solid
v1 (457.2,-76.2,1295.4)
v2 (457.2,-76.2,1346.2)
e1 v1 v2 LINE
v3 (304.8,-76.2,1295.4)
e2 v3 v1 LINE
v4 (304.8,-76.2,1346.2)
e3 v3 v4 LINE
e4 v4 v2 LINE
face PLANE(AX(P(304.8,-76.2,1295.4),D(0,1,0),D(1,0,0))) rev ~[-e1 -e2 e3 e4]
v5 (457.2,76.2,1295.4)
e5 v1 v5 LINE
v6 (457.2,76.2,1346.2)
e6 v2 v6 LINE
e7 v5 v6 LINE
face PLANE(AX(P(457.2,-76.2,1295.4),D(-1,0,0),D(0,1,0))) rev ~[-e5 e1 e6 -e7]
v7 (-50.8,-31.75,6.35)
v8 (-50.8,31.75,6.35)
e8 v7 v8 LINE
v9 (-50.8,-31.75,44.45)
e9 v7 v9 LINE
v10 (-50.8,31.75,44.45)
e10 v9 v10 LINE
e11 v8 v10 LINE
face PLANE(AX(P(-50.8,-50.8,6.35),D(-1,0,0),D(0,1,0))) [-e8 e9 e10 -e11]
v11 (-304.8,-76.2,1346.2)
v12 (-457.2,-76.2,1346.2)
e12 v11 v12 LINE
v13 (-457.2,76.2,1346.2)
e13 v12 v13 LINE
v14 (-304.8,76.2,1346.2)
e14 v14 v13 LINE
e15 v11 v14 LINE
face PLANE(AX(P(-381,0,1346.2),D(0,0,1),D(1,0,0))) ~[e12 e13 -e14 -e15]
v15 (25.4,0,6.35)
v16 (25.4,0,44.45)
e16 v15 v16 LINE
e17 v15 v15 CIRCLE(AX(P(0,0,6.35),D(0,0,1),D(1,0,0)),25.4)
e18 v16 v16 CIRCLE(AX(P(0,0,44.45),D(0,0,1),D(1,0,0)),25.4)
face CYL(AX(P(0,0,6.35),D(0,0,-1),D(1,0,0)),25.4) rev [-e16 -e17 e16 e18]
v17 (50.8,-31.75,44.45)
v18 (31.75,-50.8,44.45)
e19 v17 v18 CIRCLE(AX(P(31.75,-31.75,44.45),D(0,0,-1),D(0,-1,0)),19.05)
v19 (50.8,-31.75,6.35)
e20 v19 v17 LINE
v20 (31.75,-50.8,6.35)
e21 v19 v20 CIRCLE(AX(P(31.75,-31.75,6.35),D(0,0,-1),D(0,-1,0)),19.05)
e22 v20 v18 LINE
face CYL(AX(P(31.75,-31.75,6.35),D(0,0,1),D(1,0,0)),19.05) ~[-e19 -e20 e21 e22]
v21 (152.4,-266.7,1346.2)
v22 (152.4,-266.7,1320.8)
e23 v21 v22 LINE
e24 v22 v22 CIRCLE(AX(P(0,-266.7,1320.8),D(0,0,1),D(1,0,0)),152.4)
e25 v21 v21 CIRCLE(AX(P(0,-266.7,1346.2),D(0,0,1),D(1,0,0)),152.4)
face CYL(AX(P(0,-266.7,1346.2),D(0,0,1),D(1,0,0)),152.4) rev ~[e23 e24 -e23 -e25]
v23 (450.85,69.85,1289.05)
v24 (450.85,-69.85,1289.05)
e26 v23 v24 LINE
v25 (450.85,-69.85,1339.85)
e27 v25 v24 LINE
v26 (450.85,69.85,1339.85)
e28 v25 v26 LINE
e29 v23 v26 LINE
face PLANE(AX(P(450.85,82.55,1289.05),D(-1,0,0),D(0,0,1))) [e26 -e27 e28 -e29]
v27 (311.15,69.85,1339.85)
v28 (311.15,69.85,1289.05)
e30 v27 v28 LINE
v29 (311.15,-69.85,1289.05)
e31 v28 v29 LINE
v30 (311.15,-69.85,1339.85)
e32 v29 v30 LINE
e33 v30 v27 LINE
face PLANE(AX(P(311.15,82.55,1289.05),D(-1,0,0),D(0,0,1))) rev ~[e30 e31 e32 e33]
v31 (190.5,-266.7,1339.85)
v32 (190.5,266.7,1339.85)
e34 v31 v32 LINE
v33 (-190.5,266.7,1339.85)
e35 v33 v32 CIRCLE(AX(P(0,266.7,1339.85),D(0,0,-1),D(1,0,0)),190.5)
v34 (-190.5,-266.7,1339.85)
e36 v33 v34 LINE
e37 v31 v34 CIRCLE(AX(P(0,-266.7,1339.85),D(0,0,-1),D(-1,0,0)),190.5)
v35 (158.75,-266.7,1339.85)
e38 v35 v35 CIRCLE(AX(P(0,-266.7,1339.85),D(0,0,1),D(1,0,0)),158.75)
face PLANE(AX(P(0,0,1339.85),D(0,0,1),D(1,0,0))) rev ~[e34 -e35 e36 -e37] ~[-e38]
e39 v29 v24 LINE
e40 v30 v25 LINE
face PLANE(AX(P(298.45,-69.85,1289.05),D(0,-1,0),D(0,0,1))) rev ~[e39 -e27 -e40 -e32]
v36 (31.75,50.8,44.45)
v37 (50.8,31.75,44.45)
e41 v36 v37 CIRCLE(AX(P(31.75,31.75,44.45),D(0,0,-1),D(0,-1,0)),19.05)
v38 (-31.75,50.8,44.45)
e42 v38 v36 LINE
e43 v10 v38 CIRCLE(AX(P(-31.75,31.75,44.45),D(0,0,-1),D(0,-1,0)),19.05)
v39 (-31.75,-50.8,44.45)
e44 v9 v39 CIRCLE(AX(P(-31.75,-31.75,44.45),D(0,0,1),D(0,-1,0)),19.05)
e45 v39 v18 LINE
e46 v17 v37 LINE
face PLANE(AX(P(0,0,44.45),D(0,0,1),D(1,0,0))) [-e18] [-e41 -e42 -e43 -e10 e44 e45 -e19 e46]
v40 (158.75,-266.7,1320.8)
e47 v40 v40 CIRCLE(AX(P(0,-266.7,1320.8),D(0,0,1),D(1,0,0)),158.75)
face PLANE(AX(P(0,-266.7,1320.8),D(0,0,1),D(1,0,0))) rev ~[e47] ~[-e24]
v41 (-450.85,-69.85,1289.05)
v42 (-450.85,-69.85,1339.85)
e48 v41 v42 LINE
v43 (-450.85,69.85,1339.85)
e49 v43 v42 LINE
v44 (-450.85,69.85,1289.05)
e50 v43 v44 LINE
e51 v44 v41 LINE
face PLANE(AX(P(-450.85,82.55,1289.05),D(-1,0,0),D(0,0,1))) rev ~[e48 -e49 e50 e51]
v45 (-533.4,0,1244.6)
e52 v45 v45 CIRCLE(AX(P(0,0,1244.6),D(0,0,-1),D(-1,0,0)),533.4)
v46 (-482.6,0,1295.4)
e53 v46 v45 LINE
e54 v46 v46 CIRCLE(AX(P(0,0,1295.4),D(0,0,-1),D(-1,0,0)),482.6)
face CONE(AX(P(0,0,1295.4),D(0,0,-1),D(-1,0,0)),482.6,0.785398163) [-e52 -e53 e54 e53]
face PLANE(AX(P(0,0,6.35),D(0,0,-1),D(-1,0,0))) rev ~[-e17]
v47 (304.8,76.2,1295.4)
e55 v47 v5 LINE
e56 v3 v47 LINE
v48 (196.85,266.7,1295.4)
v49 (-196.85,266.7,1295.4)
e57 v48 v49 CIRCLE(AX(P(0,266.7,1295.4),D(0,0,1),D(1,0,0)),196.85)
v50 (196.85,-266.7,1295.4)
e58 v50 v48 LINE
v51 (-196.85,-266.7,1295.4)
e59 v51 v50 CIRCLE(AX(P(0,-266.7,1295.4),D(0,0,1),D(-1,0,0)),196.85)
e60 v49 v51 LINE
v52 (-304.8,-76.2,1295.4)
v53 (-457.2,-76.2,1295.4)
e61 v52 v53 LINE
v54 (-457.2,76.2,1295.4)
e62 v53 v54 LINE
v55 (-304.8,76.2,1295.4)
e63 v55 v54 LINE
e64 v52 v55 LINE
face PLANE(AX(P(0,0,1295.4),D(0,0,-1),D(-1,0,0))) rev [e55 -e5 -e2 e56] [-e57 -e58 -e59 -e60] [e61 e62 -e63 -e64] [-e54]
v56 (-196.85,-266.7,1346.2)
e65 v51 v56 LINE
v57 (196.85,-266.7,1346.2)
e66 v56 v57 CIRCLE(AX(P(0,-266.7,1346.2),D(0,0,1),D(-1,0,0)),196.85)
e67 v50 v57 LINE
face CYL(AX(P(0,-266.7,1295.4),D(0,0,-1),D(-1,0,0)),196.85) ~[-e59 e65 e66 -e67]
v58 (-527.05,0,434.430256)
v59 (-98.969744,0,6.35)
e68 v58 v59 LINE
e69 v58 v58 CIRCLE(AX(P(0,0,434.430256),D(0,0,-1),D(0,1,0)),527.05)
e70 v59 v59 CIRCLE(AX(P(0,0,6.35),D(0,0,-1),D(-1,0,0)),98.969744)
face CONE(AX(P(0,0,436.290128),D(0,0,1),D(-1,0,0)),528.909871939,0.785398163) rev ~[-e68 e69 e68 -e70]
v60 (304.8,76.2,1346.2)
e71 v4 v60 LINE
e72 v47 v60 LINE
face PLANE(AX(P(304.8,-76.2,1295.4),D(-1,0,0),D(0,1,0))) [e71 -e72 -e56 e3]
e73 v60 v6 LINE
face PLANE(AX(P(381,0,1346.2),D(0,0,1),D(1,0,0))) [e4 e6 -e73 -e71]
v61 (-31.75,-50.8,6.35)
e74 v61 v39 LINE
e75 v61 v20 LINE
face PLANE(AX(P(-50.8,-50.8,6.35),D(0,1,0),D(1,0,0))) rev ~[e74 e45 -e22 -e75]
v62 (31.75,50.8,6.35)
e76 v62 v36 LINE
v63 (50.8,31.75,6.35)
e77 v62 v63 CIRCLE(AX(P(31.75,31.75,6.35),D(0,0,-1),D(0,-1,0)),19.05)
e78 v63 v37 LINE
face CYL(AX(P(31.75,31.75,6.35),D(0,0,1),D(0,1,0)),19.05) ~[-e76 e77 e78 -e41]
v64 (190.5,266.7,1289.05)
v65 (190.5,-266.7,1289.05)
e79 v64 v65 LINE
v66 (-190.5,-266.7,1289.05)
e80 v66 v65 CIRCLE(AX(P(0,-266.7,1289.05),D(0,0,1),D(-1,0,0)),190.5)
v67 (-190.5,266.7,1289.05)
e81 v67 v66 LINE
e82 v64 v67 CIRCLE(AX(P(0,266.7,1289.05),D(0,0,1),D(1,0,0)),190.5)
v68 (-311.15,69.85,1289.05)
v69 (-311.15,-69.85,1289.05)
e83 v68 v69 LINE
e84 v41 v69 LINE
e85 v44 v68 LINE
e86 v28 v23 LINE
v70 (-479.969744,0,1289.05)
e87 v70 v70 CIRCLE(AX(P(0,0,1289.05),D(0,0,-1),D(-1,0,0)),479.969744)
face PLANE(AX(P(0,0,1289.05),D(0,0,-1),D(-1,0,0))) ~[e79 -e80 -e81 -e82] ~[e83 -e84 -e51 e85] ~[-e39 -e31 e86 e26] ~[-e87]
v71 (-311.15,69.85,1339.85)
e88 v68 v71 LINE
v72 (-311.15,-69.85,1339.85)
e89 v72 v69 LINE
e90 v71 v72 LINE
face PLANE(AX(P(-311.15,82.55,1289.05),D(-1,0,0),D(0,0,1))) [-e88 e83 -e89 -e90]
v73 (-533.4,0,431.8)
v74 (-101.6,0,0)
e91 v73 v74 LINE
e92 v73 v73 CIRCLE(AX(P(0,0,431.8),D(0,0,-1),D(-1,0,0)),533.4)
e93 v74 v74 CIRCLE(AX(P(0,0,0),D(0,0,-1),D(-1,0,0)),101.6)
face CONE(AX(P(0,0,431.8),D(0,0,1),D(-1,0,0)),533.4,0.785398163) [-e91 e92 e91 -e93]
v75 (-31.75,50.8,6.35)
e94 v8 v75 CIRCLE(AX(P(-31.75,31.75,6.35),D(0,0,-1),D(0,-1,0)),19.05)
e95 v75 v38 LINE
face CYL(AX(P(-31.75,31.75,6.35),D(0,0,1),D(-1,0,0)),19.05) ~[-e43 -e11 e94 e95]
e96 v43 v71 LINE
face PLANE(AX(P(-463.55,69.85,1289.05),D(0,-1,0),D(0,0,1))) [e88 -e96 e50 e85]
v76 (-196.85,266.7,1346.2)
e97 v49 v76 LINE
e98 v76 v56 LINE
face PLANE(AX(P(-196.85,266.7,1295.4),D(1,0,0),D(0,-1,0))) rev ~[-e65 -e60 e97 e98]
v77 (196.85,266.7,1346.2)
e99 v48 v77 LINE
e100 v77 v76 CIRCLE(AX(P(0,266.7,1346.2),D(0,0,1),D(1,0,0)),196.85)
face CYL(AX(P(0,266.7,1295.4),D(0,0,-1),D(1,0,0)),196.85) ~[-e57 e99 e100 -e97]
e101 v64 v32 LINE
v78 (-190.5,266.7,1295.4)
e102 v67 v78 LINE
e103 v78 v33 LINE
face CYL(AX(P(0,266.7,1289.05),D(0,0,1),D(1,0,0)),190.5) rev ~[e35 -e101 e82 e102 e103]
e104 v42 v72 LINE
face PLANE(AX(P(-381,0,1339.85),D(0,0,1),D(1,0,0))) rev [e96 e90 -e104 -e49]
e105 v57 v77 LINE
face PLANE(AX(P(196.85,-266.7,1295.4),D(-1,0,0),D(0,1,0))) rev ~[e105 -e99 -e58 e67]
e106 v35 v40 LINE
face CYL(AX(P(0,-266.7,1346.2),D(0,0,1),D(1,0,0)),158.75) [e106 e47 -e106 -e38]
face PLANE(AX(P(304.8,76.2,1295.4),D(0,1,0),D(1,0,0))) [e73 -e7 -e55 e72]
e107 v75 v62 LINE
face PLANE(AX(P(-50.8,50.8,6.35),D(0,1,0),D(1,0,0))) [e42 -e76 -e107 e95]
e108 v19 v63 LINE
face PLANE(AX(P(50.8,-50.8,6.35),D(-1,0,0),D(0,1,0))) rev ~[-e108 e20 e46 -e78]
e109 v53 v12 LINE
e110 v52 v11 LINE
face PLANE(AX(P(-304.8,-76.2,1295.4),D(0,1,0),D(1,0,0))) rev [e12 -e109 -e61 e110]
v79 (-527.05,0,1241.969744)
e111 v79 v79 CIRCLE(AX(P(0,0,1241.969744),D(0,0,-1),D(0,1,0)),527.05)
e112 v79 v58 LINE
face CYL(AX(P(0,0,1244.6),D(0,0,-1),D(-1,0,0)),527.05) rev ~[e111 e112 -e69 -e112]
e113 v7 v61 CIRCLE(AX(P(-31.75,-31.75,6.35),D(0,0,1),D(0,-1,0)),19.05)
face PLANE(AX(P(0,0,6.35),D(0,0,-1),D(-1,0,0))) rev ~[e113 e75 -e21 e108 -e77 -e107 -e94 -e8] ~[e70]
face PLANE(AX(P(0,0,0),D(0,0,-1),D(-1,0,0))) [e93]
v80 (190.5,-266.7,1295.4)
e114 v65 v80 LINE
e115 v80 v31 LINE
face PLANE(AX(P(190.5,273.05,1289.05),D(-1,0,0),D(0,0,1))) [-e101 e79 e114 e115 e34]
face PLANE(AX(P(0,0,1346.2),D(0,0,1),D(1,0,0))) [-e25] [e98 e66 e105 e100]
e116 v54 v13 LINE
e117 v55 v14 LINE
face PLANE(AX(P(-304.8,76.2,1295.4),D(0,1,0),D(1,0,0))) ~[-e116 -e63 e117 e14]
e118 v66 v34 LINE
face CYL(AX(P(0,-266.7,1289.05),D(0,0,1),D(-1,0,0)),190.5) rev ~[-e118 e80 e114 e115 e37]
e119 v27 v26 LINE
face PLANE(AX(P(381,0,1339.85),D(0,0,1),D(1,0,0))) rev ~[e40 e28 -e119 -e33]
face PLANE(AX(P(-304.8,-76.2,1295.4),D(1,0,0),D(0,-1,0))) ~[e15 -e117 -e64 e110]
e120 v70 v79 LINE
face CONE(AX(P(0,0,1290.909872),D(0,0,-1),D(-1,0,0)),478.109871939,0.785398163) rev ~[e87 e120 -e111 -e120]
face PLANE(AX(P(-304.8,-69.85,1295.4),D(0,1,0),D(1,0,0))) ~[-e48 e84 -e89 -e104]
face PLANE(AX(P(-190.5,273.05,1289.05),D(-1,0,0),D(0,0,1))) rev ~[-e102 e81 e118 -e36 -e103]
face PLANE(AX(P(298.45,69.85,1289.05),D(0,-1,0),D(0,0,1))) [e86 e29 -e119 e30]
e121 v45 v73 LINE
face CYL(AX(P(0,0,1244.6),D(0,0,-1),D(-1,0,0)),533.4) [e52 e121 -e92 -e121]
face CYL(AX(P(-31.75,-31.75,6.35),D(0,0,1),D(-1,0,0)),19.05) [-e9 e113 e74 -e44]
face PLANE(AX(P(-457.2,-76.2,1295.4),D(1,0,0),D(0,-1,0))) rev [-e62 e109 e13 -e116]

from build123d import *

# Parameters (mm, degrees)
F2_W         = 152.4
F2_H         = 152.4
F3_DEPTH     = 50.8
F5_DEPTH     = 50.8
F6_R         = 152.4
F7_DEPTH     = 25.4
F8_T         = 6.35
F8_T3_DEPTH  = 165.1
F8_T5_DEPTH  = 165.1
F8_T7_DEPTH  = 546.1
F8_T9_DEPTH  = 165.1
F8_T12_ANGLE = 180.000000001
F8_T14_ANGLE = 180.000000001
F9_W         = 101.6
F9_H         = 101.6
F9_R         = 25.4
F10_DEPTH    = 38.1
F11_R        = 19.05


# Not quite as in the source:
# - a pattern or mirror of a feature is missing from the dataset's text; its kind, count and spacing are read off the source's solid
# - a shell that OpenCascade refuses in one call is made with other operations: the cavity is built on its own and cut out


with BuildPart() as f1:
    # F0 (on Front) → F1 (revolve)
    with BuildSketch(Plane.XZ):
        Polygon((-101.6, 0), (0, 0), (0, 1295.4), (-482.6, 1295.4), (-533.4, 1244.6), (-533.4, 431.8), align=None)
    revolve(axis=Axis((0, 0, 647.7), (0, 0, -1)))

    # F2 (on face) → F3 (join)
    with BuildSketch(Plane.XY.offset(1295.4)):
        with Locations((381, 0)):
            Rectangle(F2_W, F2_H)
    f3 = extrude(amount=F3_DEPTH)

    # F3_copies: F3 across plane
    add(f3.mirror(Plane(origin=(0, 0, 0), x_dir=(0, 0, -1), z_dir=(-1, 0, 0))))

    # F4 (on face) → F5 (join)
    with BuildSketch(Plane.XY.offset(1295.4)):
        with BuildLine():
            ThreePointArc((0, 463.55), (-139.1939698766, 405.8939698766), (-196.85, 266.7))
            Line((-196.85, 266.7), (-196.85, -266.7))
            ThreePointArc((-196.85, -266.7), (-139.1939698766, -405.8939698766), (0, -463.55))
            ThreePointArc((0, -463.55), (139.1939698766, -405.8939698766), (196.85, -266.7))
            Line((196.85, -266.7), (196.85, 266.7))
            ThreePointArc((196.85, 266.7), (139.1939698766, 405.8939698766), (0, 463.55))
        make_face()
    extrude(amount=F5_DEPTH)

    # F6 (on face) → F7 (cut)
    with BuildSketch(Plane.XY.offset(1346.2)):
        with Locations((0, -266.7)):
            Circle(F6_R)
    extrude(amount=-F7_DEPTH, mode=Mode.SUBTRACT)

    # F8: shell of thickness 6.35, made by hand


with BuildPart() as f8_core1:
    # F8_t2: copy of F1
    add(f1.part)

    # the walls: a layer under each face that stays
    f8_faces = [f8_core1.faces().sort_by_distance(p)[0] for p in [
        (0, 0, 0),
        (317.5, 0, 215.9),
        (533.4, 0, 838.2),
        (508, 0, 1270),
        (-321.7333333333, -321.7333333333, 1295.4),
        (-457.2, 0, 1320.8),
        (-381, -76.2, 1320.8),
        (-381, 76.2, 1320.8),
        (-304.8, 0, 1320.8),
        (0, 463.55, 1320.8),
        (-196.85, 0, 1320.8),
        (0, -463.55, 1320.8),
        (196.85, 0, 1320.8),
        (381, 76.2, 1320.8),
        (457.2, 0, 1320.8),
        (304.8, 0, 1320.8),
        (381, -76.2, 1320.8),
        (-381, 0, 1346.2),
        (0, 0, 1346.2),
        (381, 0, 1346.2),
        (-152.4, -266.7, 1333.5),
    ]]
    thicken(f8_faces, amount=-F8_T, mode=Mode.SUBTRACT)

    # F8_s4 → F8_t3 (cut)
    with BuildSketch(Plane.XZ.offset(-82.55)):
        Polygon((-457.2635, 1295.4635), (-457.2, 1289.05), (-450.85, 1289.05), (-450.85, 1295.4), align=None)
        Polygon((-304.7365, 1295.4635), (-304.8, 1289.05), (-311.15, 1289.05), (-311.15, 1295.4), align=None)
        Polygon((457.2635, 1295.4635), (457.2, 1289.05), (450.85, 1289.05), (450.85, 1295.4), align=None)
        Polygon((304.7365, 1295.4635), (304.8, 1289.05), (311.15, 1289.05), (311.15, 1295.4), align=None)
    extrude(amount=F8_T3_DEPTH, mode=Mode.SUBTRACT)

    # F8_s6 → F8_t5 (cut)
    with BuildSketch(Plane.YZ.offset(-463.55)):
        Polygon((-76.2635, 1295.4635), (-76.2, 1289.05), (-69.85, 1289.05), (-69.85, 1295.4), align=None)
        Polygon((76.2635, 1295.4635), (76.2, 1289.05), (69.85, 1289.05), (69.85, 1295.4), align=None)
    extrude(amount=F8_T5_DEPTH, mode=Mode.SUBTRACT)

    # F8_s8 → F8_t7 (cut)
    with BuildSketch(Plane.XZ.offset(-273.05)):
        Polygon((-196.9135, 1295.4635), (-196.85, 1289.05), (-190.5, 1289.05), (-190.5, 1295.4), align=None)
        Polygon((196.9135, 1295.4635), (196.85, 1289.05), (190.5, 1289.05), (190.5, 1295.4), align=None)
    extrude(amount=F8_T7_DEPTH, mode=Mode.SUBTRACT)

    # F8_s10 → F8_t9 (cut)
    with BuildSketch(Plane.YZ.offset(298.45)):
        Polygon((76.2635, 1295.4635), (76.2, 1289.05), (69.85, 1289.05), (69.85, 1295.4), align=None)
        Polygon((-76.2635, 1295.4635), (-76.2, 1289.05), (-69.85, 1289.05), (-69.85, 1295.4), align=None)
    extrude(amount=F8_T9_DEPTH, mode=Mode.SUBTRACT)

    # F8_s11 → F8_t12 (revolve, cut)
    with BuildSketch(Plane.XZ.offset(-266.7)):
        Polygon((196.9135, 1295.4635), (196.85, 1289.05), (190.5, 1289.05), (190.5, 1295.4), align=None)
    revolve(axis=Axis((0, 266.7, 1295.4), (0, 0, 1)), revolution_arc=F8_T12_ANGLE, mode=Mode.SUBTRACT)

    # F8_s13 → F8_t14 (revolve, cut)
    with BuildSketch(Plane.XZ.offset(266.7)):
        Polygon((-196.9135, 1295.4635), (-196.85, 1289.05), (-190.5, 1289.05), (-190.5, 1295.4), align=None)
    revolve(axis=Axis((0, -266.7, 1295.4), (0, 0, 1)), revolution_arc=F8_T14_ANGLE, mode=Mode.SUBTRACT)


with BuildPart() as f1_1:
    add(f1.part)

    # what is left inside the walls is the cavity
    f8_cavity = [f8_core1.part.solids().sort_by_distance(p)[0] for p in [
        (526.9865, 0, 972.789915),
    ]]
    add(f8_cavity, mode=Mode.SUBTRACT)

    # F9 (on face) → F10 (join)
    with BuildSketch(Plane.XY.offset(6.35)):
        Rectangle(F9_W, F9_H)
        Circle(F9_R, mode=Mode.SUBTRACT)
    extrude(amount=F10_DEPTH)

    # F11
    f11_edges = [f1_1.edges().sort_by_distance(p)[0] for p in [
        (-50.8, -50.8, 25.4),
        (50.8, -50.8, 25.4),
        (50.8, 50.8, 25.4),
        (-50.8, 50.8, 25.4),
    ]]
    fillet(f11_edges, radius=F11_R)


solid = f1_1.part
